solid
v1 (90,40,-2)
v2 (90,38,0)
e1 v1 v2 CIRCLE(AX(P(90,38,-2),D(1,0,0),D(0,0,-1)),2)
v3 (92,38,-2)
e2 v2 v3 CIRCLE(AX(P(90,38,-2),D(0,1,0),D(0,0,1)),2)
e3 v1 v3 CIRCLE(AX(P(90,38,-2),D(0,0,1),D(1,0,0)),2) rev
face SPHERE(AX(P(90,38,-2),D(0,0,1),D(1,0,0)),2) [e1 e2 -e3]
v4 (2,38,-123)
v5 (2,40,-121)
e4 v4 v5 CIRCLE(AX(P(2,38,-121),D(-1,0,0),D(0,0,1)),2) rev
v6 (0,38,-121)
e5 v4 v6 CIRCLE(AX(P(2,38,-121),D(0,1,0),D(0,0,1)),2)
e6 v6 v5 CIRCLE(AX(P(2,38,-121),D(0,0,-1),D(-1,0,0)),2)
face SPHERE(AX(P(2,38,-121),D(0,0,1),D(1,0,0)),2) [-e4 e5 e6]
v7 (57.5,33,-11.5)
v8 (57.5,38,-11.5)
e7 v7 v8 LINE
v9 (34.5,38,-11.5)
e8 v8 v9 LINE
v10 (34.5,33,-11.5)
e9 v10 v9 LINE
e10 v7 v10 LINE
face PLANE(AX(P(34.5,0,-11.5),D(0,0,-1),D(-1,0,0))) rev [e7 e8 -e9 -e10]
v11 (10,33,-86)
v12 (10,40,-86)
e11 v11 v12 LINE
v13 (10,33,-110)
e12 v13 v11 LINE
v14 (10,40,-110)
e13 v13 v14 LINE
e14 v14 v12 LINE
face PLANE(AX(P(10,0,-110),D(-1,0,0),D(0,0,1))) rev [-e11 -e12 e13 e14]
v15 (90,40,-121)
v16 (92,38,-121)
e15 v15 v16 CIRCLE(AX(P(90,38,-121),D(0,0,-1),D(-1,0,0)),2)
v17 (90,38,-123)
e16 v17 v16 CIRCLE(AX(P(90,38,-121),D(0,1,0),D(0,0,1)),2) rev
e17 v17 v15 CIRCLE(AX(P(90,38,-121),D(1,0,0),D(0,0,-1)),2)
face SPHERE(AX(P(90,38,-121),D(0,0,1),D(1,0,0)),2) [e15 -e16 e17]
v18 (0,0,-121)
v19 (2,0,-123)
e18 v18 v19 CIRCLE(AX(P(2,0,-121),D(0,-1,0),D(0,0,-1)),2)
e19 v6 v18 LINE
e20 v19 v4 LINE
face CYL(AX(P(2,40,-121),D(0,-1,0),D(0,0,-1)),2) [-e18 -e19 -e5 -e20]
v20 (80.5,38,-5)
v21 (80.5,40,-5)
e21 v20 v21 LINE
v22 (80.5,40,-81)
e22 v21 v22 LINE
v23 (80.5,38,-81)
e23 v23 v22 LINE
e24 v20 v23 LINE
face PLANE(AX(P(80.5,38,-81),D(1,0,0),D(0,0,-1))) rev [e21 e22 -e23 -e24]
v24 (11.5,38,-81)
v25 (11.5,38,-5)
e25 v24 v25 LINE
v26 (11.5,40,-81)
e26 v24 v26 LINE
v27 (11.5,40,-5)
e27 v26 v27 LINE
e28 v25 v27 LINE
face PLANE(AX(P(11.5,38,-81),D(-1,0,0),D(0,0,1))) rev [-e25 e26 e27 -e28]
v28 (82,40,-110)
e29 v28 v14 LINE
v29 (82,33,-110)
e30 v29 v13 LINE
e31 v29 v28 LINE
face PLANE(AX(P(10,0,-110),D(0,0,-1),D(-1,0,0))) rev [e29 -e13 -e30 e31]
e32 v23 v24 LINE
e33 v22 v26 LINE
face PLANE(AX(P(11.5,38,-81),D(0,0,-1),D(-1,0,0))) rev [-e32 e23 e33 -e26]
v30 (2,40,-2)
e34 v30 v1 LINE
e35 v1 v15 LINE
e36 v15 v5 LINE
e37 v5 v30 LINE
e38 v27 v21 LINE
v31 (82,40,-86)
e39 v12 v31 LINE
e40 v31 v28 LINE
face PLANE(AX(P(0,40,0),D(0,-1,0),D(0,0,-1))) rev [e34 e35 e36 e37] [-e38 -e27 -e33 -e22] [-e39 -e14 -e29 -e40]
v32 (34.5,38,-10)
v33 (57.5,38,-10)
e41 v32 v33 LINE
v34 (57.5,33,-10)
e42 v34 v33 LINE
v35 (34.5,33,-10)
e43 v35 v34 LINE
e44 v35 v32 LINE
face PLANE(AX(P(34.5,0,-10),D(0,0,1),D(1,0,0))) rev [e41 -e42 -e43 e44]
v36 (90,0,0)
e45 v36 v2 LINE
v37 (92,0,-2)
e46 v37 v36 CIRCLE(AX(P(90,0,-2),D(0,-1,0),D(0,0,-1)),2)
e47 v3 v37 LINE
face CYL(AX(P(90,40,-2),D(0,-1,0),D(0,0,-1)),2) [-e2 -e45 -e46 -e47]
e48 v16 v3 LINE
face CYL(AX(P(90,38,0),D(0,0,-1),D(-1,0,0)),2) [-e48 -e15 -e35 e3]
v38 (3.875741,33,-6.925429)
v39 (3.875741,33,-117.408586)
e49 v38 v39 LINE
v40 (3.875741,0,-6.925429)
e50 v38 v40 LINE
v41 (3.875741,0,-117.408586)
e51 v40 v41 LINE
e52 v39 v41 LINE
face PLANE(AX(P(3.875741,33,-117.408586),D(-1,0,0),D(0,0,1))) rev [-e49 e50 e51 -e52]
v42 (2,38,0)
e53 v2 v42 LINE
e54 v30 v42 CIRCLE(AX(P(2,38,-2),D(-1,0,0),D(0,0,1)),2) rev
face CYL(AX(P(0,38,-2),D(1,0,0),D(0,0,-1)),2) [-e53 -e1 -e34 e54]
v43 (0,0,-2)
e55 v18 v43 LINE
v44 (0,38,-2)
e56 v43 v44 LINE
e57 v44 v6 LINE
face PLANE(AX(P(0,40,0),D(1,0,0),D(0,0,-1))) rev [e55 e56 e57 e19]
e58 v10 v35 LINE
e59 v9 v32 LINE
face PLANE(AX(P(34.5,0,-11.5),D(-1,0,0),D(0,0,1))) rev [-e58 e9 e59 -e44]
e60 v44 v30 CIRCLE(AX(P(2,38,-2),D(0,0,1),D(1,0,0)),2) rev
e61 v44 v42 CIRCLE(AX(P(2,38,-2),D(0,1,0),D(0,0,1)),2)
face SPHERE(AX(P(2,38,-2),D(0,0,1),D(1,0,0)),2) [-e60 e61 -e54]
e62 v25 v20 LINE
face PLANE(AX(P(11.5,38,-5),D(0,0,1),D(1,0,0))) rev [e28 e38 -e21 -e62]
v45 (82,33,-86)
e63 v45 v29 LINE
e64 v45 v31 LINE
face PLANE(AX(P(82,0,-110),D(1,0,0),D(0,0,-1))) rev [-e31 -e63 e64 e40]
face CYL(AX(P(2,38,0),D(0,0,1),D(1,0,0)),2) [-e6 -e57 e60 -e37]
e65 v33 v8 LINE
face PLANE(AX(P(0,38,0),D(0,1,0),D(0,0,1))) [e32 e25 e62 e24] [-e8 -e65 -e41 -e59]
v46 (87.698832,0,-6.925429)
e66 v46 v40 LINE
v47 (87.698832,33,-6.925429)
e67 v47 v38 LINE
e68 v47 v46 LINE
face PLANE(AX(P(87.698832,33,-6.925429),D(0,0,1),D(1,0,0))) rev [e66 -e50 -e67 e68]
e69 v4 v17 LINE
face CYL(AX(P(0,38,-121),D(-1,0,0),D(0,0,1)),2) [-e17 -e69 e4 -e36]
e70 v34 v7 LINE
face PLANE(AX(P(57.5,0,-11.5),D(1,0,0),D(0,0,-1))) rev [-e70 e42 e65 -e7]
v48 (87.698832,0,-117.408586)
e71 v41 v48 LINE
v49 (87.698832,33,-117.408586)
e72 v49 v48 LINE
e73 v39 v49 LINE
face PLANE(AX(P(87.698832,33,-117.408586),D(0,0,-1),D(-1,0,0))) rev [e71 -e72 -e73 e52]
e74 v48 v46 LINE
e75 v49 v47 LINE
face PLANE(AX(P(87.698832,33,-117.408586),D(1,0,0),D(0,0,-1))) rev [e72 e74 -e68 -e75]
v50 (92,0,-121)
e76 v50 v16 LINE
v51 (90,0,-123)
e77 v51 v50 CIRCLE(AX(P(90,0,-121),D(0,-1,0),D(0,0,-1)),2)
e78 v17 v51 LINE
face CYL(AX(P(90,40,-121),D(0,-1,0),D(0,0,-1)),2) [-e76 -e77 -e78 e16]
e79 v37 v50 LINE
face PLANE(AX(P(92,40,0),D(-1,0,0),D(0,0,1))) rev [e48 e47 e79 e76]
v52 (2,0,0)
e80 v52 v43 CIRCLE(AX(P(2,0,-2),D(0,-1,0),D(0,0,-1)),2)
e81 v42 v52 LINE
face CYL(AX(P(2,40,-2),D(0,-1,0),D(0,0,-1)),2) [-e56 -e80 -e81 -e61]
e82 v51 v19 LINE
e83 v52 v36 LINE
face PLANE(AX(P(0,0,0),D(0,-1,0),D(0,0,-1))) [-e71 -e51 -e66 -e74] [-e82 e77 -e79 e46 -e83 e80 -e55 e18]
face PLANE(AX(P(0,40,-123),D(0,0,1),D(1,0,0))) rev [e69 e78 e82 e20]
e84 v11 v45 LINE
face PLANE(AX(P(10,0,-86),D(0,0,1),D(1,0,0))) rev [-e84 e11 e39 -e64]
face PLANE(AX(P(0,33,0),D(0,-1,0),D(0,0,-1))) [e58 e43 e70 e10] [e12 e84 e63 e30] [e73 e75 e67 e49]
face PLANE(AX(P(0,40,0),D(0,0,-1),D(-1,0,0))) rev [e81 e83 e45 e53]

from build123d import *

# Parameters (mm, degrees)
SKETCH1_W           = 92
SKETCH1_H           = 123
BOSS_EXTRUDE1_DEPTH = 40
SKETCH2_W           = 72
SKETCH2_H           = 24
CUT_EXTRUDE1_DEPTH  = 159.723029205
SKETCH3_W           = 69
SKETCH3_H           = 76
CUT_EXTRUDE2_DEPTH  = 2
SKETCH5_W           = 23
SKETCH5_H           = 1.5
CUT_EXTRUDE4_DEPTH  = 159.230844022
FILLET1_R           = 2
SHELL10_START       = 7
SHELL10_DEPTH       = 24
SKETCH8_W           = 83.82309106
SKETCH8_H           = 110.483157271
CUT_EXTRUDE6_DEPTH  = 33


# Read off the part's stored shape, not the designer's step: Shell10
with BuildPart() as part:
    # Sketch1 → Boss-Extrude1 (new body)
    with BuildSketch(Plane(origin=(0, 0, 0), x_dir=(1, 0, 0), z_dir=(0, 1, 0))):
        with Locations((46, 61.5)):
            Rectangle(SKETCH1_W, SKETCH1_H)
    extrude(amount=BOSS_EXTRUDE1_DEPTH)

    # Sketch2 → Cut-Extrude1 (cut, through all)
    with BuildSketch(Plane(origin=(0, 40, 0), x_dir=(1, 0, 0), z_dir=(0, 1, 0))):
        with Locations((46, 98)):
            Rectangle(SKETCH2_W, SKETCH2_H)
    extrude(amount=-CUT_EXTRUDE1_DEPTH, mode=Mode.SUBTRACT)

    # Sketch3 → Cut-Extrude2 (cut)
    with BuildSketch(Plane(origin=(0, 40, 0), x_dir=(1, 0, 0), z_dir=(0, 1, 0))):
        with Locations((46, 43)):
            Rectangle(SKETCH3_W, SKETCH3_H)
    extrude(amount=-CUT_EXTRUDE2_DEPTH, mode=Mode.SUBTRACT)

    # Sketch5 → Cut-Extrude4 (cut, through all)
    with BuildSketch(Plane(origin=(0, 38, 0), x_dir=(1, 0, 0), z_dir=(0, 1, 0))):
        with Locations((46, 10.75)):
            Rectangle(SKETCH5_W, SKETCH5_H)
    extrude(amount=-CUT_EXTRUDE4_DEPTH, mode=Mode.SUBTRACT)

    # Fillet1
    fillet1_edges = [part.edges().sort_by_distance(p)[0] for p in [
        (92, 40, -61.5),
        (46, 40, -123),
        (0, 40, -61.5),
        (0, 20, -123),
        (92, 20, -123),
        (92, 20, 0),
        (0, 20, 0),
        (46, 40, 0),
    ]]
    fillet(fillet1_edges, radius=FILLET1_R)

    # Shell10 outline → Shell10 (cut)
    with BuildSketch(Plane(origin=(0, 0, 0), x_dir=(1, 0, 0), z_dir=(0, 1, 0)).offset(SHELL10_START)):
        Polygon((7, 7), (27.5, 7), (27.5, 18.5), (64.5, 18.5), (64.5, 7), (85, 7), (85, 79), (7, 79), align=None)
    extrude(amount=SHELL10_DEPTH, mode=Mode.SUBTRACT)

    # Sketch8 → Cut-Extrude6 (cut)
    with BuildSketch(Plane.XZ):
        with Locations((45.787286948, -62.167007368)):
            Rectangle(SKETCH8_W, SKETCH8_H)
    extrude(amount=-CUT_EXTRUDE6_DEPTH, mode=Mode.SUBTRACT)


solid = part.part
